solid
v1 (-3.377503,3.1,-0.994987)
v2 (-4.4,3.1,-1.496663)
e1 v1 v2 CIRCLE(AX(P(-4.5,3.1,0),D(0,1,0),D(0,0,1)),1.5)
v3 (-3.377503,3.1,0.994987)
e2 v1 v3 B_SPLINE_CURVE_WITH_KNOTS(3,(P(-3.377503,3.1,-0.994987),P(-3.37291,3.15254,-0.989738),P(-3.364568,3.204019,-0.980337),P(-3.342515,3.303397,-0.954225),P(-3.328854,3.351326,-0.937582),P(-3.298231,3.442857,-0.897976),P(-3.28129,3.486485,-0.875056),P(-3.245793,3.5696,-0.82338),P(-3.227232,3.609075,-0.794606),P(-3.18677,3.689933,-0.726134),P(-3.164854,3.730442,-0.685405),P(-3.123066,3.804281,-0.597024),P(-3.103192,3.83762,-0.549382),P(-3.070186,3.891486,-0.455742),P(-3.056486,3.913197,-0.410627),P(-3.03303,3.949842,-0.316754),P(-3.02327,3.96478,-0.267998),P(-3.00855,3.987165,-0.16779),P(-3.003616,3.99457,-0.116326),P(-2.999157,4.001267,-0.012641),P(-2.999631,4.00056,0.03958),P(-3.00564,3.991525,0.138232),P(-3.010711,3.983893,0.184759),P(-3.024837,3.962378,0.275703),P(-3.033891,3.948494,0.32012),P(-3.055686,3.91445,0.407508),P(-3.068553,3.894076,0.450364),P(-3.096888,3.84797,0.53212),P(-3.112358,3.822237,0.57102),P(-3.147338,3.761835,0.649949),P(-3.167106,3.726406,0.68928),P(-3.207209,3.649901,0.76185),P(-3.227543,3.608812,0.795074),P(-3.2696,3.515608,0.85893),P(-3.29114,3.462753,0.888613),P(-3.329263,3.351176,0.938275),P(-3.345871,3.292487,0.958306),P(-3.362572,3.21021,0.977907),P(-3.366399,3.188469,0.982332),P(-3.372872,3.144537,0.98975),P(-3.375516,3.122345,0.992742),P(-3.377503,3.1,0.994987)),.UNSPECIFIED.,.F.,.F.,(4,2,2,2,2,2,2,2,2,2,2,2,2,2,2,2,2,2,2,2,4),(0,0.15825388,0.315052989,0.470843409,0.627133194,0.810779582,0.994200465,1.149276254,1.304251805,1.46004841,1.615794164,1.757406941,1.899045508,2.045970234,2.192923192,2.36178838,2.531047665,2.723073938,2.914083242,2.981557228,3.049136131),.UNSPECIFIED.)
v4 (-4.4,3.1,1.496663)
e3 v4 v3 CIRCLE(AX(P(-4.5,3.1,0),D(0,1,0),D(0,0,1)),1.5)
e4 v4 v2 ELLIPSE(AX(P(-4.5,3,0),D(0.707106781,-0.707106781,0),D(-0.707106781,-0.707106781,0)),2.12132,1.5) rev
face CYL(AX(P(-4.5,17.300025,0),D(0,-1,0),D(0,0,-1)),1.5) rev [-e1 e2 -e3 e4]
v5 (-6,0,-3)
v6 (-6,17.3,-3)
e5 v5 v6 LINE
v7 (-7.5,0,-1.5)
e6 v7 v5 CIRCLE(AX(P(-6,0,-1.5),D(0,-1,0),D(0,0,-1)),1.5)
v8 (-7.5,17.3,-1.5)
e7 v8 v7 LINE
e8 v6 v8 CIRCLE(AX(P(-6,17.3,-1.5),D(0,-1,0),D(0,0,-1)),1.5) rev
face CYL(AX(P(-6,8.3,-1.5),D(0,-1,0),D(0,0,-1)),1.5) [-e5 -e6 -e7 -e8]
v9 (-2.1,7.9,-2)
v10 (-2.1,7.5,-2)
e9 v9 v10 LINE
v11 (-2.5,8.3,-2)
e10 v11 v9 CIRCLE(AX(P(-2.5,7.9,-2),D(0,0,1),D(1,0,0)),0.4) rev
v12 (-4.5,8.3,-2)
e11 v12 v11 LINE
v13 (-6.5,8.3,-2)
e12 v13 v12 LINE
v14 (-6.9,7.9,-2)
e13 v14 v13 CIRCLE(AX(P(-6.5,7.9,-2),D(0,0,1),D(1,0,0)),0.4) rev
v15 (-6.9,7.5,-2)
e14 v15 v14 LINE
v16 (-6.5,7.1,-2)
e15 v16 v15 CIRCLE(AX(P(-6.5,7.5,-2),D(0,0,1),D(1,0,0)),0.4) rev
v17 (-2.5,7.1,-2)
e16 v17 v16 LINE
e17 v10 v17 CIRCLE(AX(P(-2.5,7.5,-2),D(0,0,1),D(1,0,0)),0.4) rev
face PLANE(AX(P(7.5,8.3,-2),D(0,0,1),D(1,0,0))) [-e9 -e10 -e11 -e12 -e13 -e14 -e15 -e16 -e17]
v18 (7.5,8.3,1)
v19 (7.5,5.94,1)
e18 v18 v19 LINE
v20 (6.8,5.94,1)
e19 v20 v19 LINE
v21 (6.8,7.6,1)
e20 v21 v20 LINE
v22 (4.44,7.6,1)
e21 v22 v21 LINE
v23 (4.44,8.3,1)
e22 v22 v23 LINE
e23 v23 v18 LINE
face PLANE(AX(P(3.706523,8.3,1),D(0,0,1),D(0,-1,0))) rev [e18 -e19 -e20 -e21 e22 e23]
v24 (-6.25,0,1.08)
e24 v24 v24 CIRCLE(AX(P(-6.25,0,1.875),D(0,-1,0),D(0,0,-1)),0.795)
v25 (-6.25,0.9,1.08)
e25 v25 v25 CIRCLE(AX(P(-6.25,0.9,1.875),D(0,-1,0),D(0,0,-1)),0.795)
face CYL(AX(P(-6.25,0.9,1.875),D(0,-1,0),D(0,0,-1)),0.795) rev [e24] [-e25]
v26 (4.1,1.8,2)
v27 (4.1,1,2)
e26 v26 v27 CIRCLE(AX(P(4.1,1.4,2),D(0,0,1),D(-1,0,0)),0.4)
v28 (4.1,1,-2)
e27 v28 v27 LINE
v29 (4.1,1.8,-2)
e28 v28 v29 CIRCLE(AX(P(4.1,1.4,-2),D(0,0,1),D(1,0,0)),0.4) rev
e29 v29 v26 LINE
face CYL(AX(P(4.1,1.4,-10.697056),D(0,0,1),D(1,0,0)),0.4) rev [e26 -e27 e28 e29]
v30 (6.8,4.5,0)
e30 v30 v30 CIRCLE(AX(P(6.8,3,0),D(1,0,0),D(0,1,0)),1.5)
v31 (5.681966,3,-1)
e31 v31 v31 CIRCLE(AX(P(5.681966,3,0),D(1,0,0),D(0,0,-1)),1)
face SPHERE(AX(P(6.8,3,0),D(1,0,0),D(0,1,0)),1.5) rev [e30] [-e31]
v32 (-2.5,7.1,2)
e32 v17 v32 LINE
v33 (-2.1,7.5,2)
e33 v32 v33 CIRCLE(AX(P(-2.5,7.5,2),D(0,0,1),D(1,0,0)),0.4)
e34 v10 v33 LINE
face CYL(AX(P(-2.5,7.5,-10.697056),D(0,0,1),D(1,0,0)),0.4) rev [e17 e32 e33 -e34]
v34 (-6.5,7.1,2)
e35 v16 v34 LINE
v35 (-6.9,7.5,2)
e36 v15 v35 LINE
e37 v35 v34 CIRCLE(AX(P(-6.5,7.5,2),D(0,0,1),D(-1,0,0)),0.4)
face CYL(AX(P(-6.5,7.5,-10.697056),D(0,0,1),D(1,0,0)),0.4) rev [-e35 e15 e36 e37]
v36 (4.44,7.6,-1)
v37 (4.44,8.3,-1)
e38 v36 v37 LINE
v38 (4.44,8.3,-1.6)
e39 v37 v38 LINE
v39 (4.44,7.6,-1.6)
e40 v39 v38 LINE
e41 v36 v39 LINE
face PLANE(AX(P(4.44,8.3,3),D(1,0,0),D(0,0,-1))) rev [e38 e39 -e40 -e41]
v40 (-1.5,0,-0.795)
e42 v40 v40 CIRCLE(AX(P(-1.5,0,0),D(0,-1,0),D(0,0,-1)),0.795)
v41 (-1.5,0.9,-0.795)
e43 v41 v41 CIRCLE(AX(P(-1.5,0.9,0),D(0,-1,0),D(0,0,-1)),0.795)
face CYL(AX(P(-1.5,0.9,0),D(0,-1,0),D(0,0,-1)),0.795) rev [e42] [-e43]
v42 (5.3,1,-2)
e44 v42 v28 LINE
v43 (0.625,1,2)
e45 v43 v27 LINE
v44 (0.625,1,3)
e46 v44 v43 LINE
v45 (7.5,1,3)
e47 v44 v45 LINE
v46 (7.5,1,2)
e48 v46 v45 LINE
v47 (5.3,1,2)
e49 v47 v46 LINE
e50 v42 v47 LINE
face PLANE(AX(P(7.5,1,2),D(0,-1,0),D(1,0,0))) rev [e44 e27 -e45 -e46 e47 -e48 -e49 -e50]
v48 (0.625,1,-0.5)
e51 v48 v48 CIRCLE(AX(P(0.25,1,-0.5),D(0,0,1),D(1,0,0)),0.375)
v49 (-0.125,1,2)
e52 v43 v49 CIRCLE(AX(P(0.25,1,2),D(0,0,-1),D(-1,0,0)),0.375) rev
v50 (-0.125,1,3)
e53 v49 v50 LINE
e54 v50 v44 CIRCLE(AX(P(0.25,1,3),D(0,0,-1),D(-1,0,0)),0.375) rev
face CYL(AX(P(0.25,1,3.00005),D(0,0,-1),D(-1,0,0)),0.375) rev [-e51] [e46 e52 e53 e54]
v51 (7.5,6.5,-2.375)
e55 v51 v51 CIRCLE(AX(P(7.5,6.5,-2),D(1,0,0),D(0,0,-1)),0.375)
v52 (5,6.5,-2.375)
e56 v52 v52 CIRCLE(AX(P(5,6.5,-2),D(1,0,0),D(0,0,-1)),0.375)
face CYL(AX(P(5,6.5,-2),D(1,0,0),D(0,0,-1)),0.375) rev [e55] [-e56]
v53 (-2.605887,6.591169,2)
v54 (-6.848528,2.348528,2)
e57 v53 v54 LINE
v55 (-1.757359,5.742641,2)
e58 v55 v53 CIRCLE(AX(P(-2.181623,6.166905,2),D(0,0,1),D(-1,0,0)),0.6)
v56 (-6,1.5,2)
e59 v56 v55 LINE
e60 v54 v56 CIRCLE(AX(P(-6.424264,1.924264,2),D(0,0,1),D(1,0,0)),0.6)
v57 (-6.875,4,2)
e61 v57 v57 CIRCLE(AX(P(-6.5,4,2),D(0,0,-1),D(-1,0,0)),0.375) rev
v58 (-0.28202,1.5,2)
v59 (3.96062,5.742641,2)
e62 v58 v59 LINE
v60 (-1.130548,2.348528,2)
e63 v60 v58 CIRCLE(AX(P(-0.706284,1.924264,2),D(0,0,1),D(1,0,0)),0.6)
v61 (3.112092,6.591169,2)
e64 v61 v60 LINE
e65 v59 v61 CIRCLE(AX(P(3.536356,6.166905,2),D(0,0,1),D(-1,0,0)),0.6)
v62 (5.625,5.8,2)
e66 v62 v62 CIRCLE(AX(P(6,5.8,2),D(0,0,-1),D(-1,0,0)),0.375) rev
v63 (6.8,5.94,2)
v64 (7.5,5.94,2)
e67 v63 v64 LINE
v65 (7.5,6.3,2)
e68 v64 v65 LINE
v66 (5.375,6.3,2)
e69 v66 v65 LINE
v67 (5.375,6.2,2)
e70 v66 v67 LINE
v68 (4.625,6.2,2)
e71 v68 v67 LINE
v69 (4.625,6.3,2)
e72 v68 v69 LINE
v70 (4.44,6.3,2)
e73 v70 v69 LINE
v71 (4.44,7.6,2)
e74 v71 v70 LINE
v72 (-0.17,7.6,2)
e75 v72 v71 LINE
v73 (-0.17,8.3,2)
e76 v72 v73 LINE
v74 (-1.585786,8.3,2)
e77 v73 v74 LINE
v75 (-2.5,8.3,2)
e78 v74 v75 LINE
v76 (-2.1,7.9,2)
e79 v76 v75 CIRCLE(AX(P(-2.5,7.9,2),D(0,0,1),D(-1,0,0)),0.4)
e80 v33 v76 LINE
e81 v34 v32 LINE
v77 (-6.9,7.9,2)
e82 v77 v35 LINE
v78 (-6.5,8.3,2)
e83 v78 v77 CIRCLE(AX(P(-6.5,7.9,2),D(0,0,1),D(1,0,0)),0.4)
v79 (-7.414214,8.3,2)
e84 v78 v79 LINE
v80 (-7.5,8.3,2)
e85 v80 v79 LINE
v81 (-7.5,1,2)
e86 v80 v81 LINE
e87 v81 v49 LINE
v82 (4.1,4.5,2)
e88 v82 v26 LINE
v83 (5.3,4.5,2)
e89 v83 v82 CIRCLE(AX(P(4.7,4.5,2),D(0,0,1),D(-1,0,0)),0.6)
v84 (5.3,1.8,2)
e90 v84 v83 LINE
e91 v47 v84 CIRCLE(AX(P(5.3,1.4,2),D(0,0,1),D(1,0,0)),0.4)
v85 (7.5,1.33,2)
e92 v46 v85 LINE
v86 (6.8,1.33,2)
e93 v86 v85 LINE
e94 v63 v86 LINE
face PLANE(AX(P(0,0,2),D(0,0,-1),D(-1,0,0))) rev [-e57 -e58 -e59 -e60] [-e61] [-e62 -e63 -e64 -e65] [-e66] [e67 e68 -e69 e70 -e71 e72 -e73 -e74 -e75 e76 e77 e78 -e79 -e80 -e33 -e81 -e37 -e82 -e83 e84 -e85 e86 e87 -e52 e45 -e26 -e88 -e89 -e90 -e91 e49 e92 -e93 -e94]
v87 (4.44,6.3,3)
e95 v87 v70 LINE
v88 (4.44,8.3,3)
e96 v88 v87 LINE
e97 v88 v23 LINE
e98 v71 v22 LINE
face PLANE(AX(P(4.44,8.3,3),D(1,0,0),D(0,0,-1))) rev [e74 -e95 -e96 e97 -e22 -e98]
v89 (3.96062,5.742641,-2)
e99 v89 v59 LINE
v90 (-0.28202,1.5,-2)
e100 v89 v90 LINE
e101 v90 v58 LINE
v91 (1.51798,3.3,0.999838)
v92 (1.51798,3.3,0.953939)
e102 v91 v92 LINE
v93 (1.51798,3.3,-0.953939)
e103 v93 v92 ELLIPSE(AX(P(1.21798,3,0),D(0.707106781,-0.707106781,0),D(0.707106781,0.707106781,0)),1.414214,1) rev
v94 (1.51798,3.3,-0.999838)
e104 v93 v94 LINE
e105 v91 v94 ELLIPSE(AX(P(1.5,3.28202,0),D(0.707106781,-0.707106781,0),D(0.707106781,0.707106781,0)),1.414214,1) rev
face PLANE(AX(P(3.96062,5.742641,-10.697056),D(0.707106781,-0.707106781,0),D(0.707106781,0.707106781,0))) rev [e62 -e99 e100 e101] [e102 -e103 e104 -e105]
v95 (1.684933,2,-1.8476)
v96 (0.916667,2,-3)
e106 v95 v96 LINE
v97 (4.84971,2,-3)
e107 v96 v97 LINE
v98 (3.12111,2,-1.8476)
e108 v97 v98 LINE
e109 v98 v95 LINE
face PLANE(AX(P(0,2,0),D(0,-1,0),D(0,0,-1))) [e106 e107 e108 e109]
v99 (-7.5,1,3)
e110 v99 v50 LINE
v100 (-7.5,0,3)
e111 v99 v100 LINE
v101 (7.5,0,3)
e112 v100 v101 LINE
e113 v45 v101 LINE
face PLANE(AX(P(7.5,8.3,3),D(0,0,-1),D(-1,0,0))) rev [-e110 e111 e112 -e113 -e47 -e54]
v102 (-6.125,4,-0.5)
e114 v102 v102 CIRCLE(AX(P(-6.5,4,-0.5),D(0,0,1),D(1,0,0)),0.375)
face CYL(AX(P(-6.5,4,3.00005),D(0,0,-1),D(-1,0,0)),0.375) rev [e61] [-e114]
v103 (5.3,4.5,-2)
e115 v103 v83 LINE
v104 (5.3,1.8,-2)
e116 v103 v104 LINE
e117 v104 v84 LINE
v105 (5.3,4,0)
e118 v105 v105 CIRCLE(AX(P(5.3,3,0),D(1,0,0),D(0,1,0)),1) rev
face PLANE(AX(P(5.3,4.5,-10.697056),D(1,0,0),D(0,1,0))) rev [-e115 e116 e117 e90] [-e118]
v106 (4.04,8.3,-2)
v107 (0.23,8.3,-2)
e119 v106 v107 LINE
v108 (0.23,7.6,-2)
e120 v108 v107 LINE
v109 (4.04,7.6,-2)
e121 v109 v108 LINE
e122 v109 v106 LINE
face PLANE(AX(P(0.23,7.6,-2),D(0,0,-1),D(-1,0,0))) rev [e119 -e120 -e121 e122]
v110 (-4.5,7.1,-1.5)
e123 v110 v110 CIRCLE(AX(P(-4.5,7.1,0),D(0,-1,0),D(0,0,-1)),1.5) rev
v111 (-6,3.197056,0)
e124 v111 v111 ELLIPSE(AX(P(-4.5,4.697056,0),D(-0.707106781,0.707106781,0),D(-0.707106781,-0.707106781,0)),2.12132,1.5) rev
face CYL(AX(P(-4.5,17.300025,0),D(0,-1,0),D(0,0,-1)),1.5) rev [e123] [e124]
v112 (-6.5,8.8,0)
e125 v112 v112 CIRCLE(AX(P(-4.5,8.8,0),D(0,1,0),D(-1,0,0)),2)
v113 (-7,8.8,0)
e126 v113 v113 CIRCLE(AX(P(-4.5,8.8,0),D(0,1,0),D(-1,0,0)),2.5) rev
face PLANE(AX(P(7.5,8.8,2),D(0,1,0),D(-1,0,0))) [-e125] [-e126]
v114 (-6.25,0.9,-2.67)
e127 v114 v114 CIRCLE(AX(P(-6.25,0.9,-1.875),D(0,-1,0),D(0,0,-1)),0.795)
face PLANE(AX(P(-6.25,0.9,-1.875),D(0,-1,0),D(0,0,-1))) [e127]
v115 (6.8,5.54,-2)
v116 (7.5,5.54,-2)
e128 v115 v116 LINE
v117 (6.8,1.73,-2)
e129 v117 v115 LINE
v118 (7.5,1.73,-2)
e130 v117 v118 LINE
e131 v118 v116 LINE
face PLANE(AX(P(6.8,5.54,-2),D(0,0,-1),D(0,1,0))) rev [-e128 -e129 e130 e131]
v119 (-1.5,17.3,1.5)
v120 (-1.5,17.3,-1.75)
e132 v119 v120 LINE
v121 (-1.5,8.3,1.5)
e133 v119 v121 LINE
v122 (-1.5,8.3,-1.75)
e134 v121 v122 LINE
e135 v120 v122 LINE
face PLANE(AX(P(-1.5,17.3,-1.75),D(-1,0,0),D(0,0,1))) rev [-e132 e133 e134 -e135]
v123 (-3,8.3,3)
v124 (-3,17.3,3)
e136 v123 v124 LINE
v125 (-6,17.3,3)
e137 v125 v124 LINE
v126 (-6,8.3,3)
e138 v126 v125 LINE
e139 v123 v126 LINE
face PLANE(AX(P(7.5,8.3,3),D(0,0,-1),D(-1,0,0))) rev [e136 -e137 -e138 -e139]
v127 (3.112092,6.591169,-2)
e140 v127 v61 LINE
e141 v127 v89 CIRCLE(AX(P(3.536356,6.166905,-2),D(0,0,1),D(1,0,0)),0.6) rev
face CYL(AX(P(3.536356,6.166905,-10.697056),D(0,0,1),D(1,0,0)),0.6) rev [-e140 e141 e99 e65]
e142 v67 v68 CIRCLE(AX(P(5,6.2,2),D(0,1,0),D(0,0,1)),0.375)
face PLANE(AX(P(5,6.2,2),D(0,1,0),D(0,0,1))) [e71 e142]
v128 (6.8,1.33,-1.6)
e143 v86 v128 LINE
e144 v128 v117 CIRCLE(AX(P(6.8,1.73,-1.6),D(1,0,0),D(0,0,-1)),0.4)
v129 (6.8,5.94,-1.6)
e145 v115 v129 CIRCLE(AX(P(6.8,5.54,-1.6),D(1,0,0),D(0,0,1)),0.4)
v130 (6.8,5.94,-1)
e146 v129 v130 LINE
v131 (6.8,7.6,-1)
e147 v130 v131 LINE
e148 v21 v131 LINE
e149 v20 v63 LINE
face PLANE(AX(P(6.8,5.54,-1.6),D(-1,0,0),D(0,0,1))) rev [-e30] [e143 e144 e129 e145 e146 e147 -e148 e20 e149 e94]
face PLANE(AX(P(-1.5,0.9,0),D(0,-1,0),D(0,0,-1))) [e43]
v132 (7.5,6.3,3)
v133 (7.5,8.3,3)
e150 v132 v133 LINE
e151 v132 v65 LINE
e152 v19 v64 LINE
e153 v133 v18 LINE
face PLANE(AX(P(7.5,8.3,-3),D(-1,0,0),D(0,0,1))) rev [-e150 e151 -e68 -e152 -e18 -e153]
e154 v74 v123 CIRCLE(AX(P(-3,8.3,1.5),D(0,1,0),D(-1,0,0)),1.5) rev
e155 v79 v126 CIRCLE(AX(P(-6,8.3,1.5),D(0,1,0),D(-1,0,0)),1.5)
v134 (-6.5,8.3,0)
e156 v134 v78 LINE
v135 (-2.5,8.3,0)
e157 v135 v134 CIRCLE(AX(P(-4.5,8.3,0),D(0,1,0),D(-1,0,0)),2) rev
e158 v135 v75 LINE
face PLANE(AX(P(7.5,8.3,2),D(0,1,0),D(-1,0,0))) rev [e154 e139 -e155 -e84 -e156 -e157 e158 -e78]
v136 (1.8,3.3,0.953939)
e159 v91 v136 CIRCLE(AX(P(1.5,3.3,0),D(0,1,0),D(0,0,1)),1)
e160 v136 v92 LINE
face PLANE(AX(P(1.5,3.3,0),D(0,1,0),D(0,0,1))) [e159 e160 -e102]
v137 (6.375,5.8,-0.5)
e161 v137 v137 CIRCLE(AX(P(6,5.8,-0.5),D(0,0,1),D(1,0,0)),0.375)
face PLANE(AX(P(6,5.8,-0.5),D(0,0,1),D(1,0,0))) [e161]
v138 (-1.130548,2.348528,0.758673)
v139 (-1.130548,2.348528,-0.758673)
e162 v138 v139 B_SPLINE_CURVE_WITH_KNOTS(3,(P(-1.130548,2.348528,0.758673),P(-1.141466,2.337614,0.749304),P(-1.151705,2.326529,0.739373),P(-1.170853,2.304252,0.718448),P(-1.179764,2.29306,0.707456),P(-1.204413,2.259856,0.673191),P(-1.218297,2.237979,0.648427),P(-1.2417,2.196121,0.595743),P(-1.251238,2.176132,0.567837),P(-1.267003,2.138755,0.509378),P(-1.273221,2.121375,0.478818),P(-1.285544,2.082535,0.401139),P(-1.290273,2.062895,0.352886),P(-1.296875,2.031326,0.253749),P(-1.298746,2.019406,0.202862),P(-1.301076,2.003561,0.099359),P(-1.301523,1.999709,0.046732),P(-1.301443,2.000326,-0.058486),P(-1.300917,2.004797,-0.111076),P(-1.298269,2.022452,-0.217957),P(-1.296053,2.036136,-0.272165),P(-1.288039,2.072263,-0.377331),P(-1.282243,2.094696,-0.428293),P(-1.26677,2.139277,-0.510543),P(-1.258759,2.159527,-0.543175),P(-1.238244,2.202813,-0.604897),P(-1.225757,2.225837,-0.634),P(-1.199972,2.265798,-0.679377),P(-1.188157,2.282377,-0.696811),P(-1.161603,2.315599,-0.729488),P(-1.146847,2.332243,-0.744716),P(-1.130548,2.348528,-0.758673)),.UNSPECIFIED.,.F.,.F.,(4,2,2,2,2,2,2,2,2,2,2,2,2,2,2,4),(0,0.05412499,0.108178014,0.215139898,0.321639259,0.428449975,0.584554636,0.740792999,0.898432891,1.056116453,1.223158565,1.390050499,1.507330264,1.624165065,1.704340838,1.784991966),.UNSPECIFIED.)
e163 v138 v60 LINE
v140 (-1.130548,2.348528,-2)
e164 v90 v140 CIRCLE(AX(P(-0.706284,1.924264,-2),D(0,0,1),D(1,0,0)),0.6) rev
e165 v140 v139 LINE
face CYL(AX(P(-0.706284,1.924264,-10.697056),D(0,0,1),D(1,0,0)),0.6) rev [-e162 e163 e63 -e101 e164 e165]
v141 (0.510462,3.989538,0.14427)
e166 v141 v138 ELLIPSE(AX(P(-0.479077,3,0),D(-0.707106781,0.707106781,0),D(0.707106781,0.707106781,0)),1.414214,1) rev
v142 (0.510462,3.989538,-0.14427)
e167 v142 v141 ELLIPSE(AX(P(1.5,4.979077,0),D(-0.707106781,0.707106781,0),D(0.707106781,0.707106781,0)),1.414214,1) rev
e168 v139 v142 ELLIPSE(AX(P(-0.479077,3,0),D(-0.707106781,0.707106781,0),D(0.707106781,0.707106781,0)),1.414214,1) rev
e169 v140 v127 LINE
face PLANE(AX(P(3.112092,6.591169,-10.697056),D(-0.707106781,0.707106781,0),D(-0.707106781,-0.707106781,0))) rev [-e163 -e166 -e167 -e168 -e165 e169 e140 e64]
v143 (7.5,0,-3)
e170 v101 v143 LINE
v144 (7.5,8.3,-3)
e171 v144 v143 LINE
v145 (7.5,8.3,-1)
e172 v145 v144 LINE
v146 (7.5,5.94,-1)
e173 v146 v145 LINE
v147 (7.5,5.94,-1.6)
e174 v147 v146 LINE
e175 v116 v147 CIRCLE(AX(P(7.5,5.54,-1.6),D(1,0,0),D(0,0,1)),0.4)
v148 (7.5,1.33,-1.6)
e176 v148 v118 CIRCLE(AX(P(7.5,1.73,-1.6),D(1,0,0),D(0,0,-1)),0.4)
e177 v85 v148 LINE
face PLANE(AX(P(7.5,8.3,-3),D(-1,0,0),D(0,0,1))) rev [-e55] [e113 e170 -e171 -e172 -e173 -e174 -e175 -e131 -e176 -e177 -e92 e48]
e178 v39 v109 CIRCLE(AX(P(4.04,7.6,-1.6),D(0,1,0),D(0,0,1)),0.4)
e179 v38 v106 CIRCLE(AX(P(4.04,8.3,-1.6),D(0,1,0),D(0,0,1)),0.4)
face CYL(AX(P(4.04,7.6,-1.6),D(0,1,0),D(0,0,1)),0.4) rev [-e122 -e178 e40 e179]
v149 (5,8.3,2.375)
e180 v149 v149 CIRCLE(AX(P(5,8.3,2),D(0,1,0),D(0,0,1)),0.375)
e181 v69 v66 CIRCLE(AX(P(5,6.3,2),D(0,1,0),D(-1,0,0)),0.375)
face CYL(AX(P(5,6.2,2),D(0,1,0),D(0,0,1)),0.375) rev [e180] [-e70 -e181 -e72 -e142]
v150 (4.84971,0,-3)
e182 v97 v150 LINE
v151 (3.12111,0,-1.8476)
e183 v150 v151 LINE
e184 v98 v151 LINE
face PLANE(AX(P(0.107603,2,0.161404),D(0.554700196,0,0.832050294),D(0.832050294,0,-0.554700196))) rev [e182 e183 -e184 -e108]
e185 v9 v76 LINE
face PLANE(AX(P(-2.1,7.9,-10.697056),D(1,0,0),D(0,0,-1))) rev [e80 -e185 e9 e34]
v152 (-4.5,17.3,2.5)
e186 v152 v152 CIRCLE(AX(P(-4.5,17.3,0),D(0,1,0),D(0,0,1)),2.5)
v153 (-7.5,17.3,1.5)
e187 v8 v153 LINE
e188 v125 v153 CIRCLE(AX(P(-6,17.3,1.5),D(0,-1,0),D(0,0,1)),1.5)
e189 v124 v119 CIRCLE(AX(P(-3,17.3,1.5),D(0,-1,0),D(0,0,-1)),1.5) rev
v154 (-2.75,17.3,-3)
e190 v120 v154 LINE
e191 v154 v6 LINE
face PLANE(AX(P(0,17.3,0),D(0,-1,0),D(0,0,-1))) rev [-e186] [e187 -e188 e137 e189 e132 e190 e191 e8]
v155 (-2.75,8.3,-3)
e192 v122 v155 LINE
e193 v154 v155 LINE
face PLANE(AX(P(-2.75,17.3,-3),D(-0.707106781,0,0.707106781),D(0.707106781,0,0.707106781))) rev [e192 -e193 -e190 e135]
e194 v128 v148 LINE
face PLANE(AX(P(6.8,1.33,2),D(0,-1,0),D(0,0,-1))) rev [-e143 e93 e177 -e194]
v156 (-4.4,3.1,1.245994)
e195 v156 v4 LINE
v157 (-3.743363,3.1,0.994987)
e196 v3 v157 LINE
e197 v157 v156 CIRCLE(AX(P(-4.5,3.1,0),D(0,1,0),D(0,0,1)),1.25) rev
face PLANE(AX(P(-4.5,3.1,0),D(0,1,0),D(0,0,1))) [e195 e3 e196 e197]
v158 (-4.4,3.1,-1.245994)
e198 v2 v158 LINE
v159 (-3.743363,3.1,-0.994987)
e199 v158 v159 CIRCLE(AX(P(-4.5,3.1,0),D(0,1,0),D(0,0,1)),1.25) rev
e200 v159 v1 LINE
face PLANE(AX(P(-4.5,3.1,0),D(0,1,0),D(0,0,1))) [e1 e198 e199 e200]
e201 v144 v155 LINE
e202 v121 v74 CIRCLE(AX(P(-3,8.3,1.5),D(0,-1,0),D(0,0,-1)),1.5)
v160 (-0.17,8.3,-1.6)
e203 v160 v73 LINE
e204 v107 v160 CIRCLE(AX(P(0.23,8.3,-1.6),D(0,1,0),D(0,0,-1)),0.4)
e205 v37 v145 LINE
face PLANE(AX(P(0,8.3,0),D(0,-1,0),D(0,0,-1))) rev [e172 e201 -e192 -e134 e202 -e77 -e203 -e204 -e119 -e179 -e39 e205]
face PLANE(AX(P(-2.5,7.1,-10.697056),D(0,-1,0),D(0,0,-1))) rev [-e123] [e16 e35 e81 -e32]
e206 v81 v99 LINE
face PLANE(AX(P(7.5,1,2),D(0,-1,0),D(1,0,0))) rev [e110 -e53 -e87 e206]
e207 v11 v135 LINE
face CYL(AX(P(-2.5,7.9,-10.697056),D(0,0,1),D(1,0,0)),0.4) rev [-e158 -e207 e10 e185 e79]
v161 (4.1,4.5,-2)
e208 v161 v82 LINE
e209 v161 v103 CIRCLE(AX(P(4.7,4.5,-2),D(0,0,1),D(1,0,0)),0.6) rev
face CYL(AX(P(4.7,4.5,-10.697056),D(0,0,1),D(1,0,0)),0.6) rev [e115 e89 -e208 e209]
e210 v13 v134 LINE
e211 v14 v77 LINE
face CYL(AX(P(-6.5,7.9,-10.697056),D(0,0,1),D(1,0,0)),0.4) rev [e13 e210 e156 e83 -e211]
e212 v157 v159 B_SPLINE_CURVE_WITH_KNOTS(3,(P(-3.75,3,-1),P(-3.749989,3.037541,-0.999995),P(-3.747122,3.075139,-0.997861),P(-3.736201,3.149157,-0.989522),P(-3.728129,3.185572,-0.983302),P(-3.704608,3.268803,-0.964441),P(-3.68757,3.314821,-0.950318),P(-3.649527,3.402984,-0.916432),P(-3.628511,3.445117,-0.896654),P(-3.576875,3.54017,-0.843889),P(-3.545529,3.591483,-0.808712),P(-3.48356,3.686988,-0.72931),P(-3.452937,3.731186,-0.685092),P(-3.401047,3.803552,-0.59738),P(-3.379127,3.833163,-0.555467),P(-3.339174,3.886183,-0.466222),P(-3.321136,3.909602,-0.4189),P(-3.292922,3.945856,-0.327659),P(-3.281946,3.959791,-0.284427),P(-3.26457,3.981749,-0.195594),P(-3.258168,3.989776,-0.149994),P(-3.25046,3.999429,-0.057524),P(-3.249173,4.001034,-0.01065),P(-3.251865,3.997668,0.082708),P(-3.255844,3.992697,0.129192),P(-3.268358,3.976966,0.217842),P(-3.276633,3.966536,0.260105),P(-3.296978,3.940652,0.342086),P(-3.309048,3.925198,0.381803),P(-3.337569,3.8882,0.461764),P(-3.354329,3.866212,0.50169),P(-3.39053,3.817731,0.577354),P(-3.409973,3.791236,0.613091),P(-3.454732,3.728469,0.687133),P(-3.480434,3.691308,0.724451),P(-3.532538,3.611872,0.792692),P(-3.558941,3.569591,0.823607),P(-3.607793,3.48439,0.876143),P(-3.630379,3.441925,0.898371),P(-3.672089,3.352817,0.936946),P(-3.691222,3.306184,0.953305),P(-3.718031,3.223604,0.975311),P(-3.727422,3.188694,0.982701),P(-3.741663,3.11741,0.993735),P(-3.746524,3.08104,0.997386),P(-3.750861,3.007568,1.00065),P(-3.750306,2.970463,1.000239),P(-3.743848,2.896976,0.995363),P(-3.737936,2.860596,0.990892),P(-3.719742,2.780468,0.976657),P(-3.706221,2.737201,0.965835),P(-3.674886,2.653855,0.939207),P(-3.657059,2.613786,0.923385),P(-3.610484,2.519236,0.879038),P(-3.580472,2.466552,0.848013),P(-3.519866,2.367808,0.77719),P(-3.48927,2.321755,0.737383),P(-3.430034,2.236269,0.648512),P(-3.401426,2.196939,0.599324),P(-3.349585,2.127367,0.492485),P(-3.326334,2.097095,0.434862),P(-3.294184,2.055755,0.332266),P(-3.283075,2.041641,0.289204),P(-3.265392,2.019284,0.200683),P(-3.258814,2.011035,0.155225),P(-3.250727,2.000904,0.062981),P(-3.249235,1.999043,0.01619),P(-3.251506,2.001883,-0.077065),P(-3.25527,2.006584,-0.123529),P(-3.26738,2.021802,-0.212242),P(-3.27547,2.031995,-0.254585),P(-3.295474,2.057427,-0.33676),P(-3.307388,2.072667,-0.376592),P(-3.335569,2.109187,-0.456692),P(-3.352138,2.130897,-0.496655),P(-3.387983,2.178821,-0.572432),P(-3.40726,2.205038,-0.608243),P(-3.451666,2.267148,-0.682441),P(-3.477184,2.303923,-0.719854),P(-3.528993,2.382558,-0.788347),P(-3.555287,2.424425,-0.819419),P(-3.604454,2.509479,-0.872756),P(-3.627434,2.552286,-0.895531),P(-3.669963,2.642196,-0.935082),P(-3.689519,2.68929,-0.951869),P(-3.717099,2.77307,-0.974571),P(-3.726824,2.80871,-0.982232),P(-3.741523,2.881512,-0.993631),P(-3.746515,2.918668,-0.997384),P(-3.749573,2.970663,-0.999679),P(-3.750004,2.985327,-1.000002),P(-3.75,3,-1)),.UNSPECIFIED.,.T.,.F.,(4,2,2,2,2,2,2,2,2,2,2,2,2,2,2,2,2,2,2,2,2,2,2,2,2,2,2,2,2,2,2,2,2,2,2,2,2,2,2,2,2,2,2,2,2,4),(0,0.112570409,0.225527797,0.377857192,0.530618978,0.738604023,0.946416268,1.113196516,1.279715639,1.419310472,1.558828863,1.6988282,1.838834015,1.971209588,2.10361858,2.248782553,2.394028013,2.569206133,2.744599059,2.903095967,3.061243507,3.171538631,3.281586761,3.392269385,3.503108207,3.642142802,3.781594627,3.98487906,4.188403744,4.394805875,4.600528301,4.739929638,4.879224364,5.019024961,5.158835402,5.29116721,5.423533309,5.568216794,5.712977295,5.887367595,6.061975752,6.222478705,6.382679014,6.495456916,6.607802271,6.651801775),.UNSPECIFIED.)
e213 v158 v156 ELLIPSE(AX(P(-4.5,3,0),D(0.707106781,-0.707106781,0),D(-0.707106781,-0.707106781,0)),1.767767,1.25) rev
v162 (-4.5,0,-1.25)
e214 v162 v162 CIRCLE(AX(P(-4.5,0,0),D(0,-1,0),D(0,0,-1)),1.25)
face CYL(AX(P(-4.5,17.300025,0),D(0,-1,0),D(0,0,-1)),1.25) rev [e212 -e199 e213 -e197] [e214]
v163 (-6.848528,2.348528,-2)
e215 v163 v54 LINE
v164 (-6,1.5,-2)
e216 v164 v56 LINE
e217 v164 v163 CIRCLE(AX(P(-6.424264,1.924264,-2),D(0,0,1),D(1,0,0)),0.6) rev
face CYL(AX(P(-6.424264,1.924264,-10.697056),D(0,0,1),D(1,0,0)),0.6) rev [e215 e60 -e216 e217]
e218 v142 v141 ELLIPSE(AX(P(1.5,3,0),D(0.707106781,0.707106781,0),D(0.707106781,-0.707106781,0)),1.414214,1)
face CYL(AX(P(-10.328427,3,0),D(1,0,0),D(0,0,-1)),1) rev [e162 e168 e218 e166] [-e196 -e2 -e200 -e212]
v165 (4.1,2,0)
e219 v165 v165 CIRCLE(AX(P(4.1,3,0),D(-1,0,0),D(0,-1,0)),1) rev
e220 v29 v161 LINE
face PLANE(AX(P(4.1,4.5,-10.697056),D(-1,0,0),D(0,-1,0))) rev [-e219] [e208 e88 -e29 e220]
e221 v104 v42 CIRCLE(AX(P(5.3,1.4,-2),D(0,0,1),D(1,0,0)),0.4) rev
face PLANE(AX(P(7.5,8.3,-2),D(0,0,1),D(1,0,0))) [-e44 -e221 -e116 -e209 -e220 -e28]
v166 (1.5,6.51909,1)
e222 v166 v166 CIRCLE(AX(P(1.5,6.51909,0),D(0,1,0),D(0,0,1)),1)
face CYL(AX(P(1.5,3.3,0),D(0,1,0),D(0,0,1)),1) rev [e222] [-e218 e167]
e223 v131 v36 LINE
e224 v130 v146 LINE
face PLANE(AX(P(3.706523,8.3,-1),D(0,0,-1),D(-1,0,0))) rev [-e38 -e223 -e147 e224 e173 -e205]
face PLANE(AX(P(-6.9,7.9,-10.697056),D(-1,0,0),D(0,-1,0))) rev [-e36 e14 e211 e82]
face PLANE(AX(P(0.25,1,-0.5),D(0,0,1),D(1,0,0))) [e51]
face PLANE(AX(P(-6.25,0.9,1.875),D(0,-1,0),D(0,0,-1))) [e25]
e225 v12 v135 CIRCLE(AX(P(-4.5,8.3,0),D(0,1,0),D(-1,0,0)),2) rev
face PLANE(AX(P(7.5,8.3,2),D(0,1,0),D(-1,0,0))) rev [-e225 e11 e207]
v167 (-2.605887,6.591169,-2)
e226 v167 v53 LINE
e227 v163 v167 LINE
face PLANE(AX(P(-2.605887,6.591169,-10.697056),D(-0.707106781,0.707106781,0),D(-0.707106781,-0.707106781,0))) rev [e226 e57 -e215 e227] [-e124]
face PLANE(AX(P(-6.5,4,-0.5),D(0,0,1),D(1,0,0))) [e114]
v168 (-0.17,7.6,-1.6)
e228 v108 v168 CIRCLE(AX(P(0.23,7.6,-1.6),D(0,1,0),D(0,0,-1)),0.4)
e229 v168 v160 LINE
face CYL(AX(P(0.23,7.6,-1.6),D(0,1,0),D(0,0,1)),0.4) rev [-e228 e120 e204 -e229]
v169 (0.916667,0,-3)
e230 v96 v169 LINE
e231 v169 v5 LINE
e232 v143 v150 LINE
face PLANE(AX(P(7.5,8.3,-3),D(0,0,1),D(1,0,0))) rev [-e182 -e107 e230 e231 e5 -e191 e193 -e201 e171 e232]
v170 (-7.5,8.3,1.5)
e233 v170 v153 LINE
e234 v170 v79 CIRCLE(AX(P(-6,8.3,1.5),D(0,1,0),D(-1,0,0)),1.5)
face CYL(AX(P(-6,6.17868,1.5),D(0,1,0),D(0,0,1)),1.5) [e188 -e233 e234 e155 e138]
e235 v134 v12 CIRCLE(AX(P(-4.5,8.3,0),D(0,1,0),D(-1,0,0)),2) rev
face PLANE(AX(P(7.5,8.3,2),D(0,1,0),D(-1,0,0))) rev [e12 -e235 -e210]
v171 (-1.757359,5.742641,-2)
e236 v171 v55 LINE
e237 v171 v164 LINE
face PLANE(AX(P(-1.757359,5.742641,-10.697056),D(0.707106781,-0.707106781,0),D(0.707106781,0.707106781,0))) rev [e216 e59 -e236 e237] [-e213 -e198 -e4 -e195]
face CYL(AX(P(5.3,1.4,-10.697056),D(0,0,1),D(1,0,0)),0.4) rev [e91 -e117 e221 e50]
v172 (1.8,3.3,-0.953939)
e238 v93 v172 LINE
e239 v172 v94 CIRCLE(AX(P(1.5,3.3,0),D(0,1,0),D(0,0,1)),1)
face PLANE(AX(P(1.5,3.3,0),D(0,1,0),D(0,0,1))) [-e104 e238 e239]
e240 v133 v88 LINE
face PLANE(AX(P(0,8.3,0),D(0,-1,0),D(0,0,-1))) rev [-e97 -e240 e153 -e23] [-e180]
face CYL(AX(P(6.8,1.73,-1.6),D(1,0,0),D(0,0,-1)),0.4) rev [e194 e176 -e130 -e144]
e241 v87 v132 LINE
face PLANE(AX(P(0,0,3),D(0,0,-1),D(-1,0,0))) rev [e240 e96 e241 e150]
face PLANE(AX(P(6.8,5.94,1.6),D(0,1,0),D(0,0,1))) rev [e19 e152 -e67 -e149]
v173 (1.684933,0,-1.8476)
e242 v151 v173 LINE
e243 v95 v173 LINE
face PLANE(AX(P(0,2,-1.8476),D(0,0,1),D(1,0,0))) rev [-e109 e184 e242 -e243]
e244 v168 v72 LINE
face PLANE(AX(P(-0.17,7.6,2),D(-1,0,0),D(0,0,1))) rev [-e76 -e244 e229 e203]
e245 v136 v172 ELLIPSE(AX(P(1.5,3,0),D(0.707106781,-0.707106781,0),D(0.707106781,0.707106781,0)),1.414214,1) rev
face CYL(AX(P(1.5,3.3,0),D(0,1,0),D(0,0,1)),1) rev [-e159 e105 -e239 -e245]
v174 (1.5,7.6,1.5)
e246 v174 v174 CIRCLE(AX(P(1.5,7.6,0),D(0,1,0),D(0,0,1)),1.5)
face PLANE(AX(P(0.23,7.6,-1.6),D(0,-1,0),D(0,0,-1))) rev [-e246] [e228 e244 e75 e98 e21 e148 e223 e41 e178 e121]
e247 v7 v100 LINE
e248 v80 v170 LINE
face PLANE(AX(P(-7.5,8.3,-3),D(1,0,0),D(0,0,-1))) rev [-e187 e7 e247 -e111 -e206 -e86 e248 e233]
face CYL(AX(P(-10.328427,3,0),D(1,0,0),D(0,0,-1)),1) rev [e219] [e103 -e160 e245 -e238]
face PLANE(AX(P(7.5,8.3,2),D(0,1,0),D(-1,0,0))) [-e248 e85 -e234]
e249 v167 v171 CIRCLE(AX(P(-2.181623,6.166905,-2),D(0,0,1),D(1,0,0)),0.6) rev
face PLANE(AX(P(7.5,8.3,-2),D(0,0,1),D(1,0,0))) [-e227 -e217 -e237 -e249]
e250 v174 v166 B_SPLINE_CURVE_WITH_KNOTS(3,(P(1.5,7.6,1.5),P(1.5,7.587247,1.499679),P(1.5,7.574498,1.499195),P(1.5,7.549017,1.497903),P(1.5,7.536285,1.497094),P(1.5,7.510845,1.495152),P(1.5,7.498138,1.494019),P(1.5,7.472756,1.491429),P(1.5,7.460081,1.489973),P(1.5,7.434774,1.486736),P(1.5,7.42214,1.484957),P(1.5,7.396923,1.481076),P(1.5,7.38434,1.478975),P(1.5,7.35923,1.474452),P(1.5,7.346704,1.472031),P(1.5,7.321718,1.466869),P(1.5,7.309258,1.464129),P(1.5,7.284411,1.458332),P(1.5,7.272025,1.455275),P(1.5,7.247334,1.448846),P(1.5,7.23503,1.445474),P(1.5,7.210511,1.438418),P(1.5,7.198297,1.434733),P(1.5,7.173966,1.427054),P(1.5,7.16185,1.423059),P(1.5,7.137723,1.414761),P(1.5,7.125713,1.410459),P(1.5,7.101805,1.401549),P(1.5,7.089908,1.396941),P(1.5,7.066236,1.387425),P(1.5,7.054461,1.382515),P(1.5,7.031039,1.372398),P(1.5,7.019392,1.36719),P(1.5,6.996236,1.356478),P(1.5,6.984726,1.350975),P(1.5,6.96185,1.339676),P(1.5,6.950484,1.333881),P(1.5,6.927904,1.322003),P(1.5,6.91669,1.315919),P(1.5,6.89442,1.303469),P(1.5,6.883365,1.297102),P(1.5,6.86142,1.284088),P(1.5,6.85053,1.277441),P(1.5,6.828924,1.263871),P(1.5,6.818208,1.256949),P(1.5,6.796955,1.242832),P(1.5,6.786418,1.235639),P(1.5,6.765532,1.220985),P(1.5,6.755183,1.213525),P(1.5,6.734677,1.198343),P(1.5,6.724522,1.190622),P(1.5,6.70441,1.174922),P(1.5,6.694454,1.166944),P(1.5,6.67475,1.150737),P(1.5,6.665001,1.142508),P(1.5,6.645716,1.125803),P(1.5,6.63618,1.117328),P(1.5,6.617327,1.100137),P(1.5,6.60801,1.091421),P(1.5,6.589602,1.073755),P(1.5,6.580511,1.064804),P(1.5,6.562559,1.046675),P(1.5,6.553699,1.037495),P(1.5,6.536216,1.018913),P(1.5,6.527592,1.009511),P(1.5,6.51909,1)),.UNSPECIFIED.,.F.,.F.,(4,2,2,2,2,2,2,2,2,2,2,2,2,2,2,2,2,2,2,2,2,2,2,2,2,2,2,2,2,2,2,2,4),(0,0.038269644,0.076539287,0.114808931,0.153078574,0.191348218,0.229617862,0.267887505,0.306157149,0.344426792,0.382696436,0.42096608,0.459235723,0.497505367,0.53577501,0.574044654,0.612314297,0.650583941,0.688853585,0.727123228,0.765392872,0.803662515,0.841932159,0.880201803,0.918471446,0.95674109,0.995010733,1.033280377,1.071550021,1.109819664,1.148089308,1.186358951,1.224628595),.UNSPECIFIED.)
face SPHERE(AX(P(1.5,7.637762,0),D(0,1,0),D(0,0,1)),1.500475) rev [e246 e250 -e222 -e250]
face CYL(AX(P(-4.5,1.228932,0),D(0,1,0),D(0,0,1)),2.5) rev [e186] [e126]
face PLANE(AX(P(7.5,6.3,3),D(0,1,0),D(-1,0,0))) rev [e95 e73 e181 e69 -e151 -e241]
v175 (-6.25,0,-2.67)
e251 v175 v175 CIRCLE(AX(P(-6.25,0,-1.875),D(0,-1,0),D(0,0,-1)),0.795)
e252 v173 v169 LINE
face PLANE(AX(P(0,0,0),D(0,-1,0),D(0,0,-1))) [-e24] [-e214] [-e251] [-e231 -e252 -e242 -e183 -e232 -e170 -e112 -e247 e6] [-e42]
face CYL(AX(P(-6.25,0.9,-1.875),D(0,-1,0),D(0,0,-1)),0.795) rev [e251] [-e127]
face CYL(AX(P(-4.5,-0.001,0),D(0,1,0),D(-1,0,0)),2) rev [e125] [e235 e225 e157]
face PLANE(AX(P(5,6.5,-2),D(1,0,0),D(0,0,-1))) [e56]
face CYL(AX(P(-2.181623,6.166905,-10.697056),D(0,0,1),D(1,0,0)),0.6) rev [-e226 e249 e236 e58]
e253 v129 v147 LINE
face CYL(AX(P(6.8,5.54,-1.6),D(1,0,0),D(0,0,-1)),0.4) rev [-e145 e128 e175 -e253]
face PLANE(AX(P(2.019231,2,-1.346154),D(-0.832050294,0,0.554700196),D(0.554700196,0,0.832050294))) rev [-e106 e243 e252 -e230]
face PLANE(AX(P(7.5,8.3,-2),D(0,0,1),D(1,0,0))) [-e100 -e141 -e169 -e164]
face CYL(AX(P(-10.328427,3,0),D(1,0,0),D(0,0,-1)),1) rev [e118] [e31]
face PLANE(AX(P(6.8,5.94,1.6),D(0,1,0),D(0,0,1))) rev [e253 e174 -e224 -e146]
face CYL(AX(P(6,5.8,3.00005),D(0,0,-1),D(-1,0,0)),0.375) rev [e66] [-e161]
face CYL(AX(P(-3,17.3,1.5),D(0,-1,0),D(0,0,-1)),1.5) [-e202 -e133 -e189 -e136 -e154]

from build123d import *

# Parameters (mm, degrees)
SKETCH1_W                        = 15
SKETCH1_H                        = 6
MAIN_BODY_EXT_DEPTH              = 8.3
EMISSION_PATH_EXT_DEPTH          = 9
SKETCH3_R                        = 1.25
EMISSION_AND_GRIN_CUT_DEPTH      = 20.092931
SKETCH4_R                        = 1
DRUM_LENS_CUT_DEPTH              = 13
SKETCH41_R                       = 1
ADDTL_LIGHT_SOURCE_DEPTH         = 5
SKETCH5_W                        = 15
SKETCH5_H                        = 7.3
FILTERCOVER_CUT1_DEPTH           = 1
TOP_LED_SCREW_W                  = 3.06
TOP_LED_SCREW_H                  = 2
BOSS_EXTRUDE1_DEPTH              = 1
FILTERSET_CUT2_DEPTH             = 4
SKETCH10_R                       = 2.5
EMISSION_LENS_CUT_DEPTH          = 8.5
SKETCH15_R                       = 0.795
MAGNETS_CUT_DEPTH                = 0.9
SCREW_HOLES_CUT_DEPTH            = 20.507434
SCREW_HOLES_CUT_DEPTH_BACK       = 2.5
SKETCH18_R                       = 0.375
EXTERNAL_FILLET_1_R              = 1.5
VERTICAL_PATH_CUT_DEPTH          = 14.011149
VERTICAL_PATH_CUT_DEPTH_BACK     = 4
SKETCH28_R                       = 1.5
CUT_EXTRUDE_ORIGINAL_LIGHT_DEPTH = 0.7
CUT_EXTRUDE_ADDTL_LIGHT_DEPTH    = 0.7
SKETCH29_R                       = 0.375
SIDE_LED_SCREW_DEPTH             = 2.5
SKETCH32_W                       = 2
SKETCH32_H                       = 2.36
SIDE_WIRE_SLOT_CUT_DEPTH         = 0.7
SKETCH45_W                       = 2.36
SKETCH45_H                       = 2
TOP_LED_SLOT_DEPTH               = 0.7
CUT_EXTRUDE16_DEPTH              = 9
CUT_EXTRUDE17_REACH              = 13.945
SKETCH37_R                       = 2
SKETCH51_R                       = 0.375
TOP_LE_SCREW_DEPTH               = 2.1
NOTCH_EXTRUDE_DEPTH              = 2


with BuildPart() as part:
    # Sketch1 → Main Body Ext (new body)
    with BuildSketch(Plane(origin=(0, 0, 0), x_dir=(1, 0, 0), z_dir=(0, 1, 0))):
        Rectangle(SKETCH1_W, SKETCH1_H)
    extrude(amount=MAIN_BODY_EXT_DEPTH)

    # Sketch8 → Emission Path Ext (add)
    with BuildSketch(Plane(origin=(0, 8.3, 0), x_dir=(1, 0, 0), z_dir=(0, 1, 0))):
        Polygon((-2.75, 3), (-1.5, 1.75), (-1.5, -3), (-7.5, -3), (-7.5, 3), align=None)
    extrude(amount=EMISSION_PATH_EXT_DEPTH)

    # Sketch3 → Emission and Grin Cut (cut, through all)
    with BuildSketch(Plane.XZ):
        with Locations(Location((-4.5, 0, 0), (0, 0, 270))):
            Circle(SKETCH3_R)
    extrude(amount=-EMISSION_AND_GRIN_CUT_DEPTH, mode=Mode.SUBTRACT)

    # Sketch4 → Drum Lens Cut (cut)
    with BuildSketch(Plane(origin=(7.5, 0, 0), x_dir=(0, 0, -1), z_dir=(1, 0, 0))):
        with Locations((0, 3)):
            Circle(SKETCH4_R)
    extrude(amount=-DRUM_LENS_CUT_DEPTH, mode=Mode.SUBTRACT)

    # Sketch41 → Addtl Light Source (cut)
    with BuildSketch(Plane(origin=(0, 8.3, 0), x_dir=(1, 0, 0), z_dir=(0, 1, 0))):
        with Locations(Location((1.5, 0, 0), (0, 0, 270))):
            Circle(SKETCH41_R)
    extrude(amount=-ADDTL_LIGHT_SOURCE_DEPTH, mode=Mode.SUBTRACT)

    # Sketch5 → FilterCover Cut1 (cut)
    with BuildSketch(Plane.XY.offset(3)):
        with Locations((0, 4.65)):
            Rectangle(SKETCH5_W, SKETCH5_H)
    extrude(amount=-FILTERCOVER_CUT1_DEPTH, mode=Mode.SUBTRACT)

    # Top-LED-Screw → Boss-Extrude1 (add)
    with BuildSketch(Plane.XY.offset(2)):
        with Locations((5.97, 7.3)):
            Rectangle(TOP_LED_SCREW_W, TOP_LED_SCREW_H)
    extrude(amount=BOSS_EXTRUDE1_DEPTH)

    # Sketch6 → FilterSet Cut2 (cut)
    with BuildSketch(Plane.XY.offset(2)):
        with BuildLine():
            Line((5.3, 4.5), (5.3, 1.8))
            ThreePointArc((5.3, 1.8), (5.7, 1.4), (5.3, 1))
            Line((5.3, 1), (4.1, 1))
            ThreePointArc((4.1, 1), (3.7, 1.4), (4.1, 1.8))
            Line((4.1, 1.8), (4.1, 4.5))
            ThreePointArc((4.1, 4.5), (4.7, 5.1), (5.3, 4.5))
        make_face()
        with BuildLine():
            Line((-6.9, 7.9), (-6.9, 7.5))
            ThreePointArc((-6.9, 7.5), (-6.782843, 7.217157), (-6.5, 7.1))
            Line((-6.5, 7.1), (-2.5, 7.1))
            ThreePointArc((-2.5, 7.1), (-2.217157, 7.217157), (-2.1, 7.5))
            Line((-2.1, 7.5), (-2.1, 7.9))
            ThreePointArc((-2.1, 7.9), (-2.217157, 8.182843), (-2.5, 8.3))
            Line((-2.5, 8.3), (-6.5, 8.3))
            ThreePointArc((-6.5, 8.3), (-6.782843, 8.182843), (-6.9, 7.9))
        make_face()
        with BuildLine():
            Line((-2.605887, 6.591169), (-6.848528, 2.348528))
            ThreePointArc((-6.848528, 2.348528), (-6.848528, 1.5), (-6, 1.5))
            Line((-6, 1.5), (-1.757359, 5.742641))
            ThreePointArc((-1.757359, 5.742641), (-1.757359, 6.591169), (-2.605887, 6.591169))
        make_face()
        with BuildLine():
            Line((3.112092, 6.591169), (-1.130548, 2.348528))
            ThreePointArc((-1.130548, 2.348528), (-1.130548, 1.5), (-0.28202, 1.5))
            Line((-0.28202, 1.5), (3.96062, 5.742641))
            ThreePointArc((3.96062, 5.742641), (3.96062, 6.591169), (3.112092, 6.591169))
        make_face()
    extrude(amount=-FILTERSET_CUT2_DEPTH, mode=Mode.SUBTRACT)

    # Sketch10 → Emission Lens Cut (cut)
    with BuildSketch(Plane(origin=(0, 17.3, 0), x_dir=(1, 0, 0), z_dir=(0, 1, 0))):
        with Locations(Location((-4.5, 0, 0), (0, 0, 270))):
            Circle(SKETCH10_R)
    extrude(amount=-EMISSION_LENS_CUT_DEPTH, mode=Mode.SUBTRACT)

    # Sketch15 → Magnets Cut (cut)
    with BuildSketch(Plane.XZ):
        with Locations(Location((-6.25, -1.875, 0), (0, 0, 270))):
            Circle(SKETCH15_R)
        with Locations(Location((-6.25, 1.875, 0), (0, 0, 270))):
            Circle(SKETCH15_R)
        with Locations(Location((-1.5, 0, 0), (0, 0, 270))):
            Circle(SKETCH15_R)
    extrude(amount=-MAGNETS_CUT_DEPTH, mode=Mode.SUBTRACT)

    # Sketch18 → Screw Holes Cut (cut, two sides: drawn at the far end of the back side and taken through both)
    with BuildSketch(Plane.XY.offset(2).offset(-SCREW_HOLES_CUT_DEPTH_BACK)):
        with Locations(Location((-6.5, 4, 0), (0, 0, 180))):
            Circle(SKETCH18_R)
        with Locations(Location((6, 5.8, 0), (0, 0, 180))):
            Circle(SKETCH18_R)
        with Locations((0.25, 1)):
            Circle(SKETCH18_R)
    extrude(amount=SCREW_HOLES_CUT_DEPTH + SCREW_HOLES_CUT_DEPTH_BACK, mode=Mode.SUBTRACT)

    # External Fillet 1
    # the kernel refuses this fillet: 1.5 mm, written as the material it takes off along each edge
    with BuildSketch(Plane(origin=(-7.5, -3.75, -3), x_dir=(1, 0, 0), z_dir=(0, 1, 0))) as external_fillet_1_piece_1:
        with BuildLine():
            CenterArc((EXTERNAL_FILLET_1_R, -EXTERNAL_FILLET_1_R), EXTERNAL_FILLET_1_R, 90, 90)
            Line((0, -EXTERNAL_FILLET_1_R), (0, 0))
            Line((0, 0), (EXTERNAL_FILLET_1_R, 0))
        make_face()
    extrude(amount=24.8, mode=Mode.SUBTRACT)
    with BuildSketch(Plane(origin=(-1.5, 8.3, 3), x_dir=(0, 0, -1), z_dir=(0, 1, 0))) as external_fillet_1_piece_2:
        with BuildLine():
            CenterArc((EXTERNAL_FILLET_1_R, EXTERNAL_FILLET_1_R), EXTERNAL_FILLET_1_R, 180, 90)
            Line((0, EXTERNAL_FILLET_1_R), (0, 0))
            Line((0, 0), (EXTERNAL_FILLET_1_R, 0))
        make_face()
    extrude(amount=12.75, mode=Mode.SUBTRACT)

    # Sketch28 → Vertical-Path-Cut (cut, two sides: drawn at the far end of the back side and taken through both)
    with BuildSketch(Plane(origin=(0, 7.1, 0), x_dir=(1, 0, 0), z_dir=(0, 1, 0)).offset(-VERTICAL_PATH_CUT_DEPTH_BACK)):
        with Locations(Location((-4.5, 0, 0), (0, 0, 180))):
            Circle(SKETCH28_R)
    extrude(amount=VERTICAL_PATH_CUT_DEPTH + VERTICAL_PATH_CUT_DEPTH_BACK, mode=Mode.SUBTRACT)

    # Sketch12 → Cut-Extrude Original Light (cut)
    with BuildSketch(Plane(origin=(7.5, 0, 0), x_dir=(0, 0, -1), z_dir=(1, 0, 0))):
        with BuildLine():
            Line((1.6, 5.94), (-1.6, 5.94))
            Line((-1.6, 5.94), (-2, 5.94))
            Line((-2, 5.94), (-2, 1.33))
            Line((-2, 1.33), (1.6, 1.33))
            ThreePointArc((1.6, 1.33), (1.882843, 1.447157), (2, 1.73))
            Line((2, 1.73), (2, 5.54))
            ThreePointArc((2, 5.54), (1.882843, 5.822843), (1.6, 5.94))
        make_face()
    extrude(amount=-CUT_EXTRUDE_ORIGINAL_LIGHT_DEPTH, mode=Mode.SUBTRACT)

    # Sketch44 → Cut-Extrude Addtl Light (cut)
    with BuildSketch(Plane(origin=(0, 8.3, 0), x_dir=(1, 0, 0), z_dir=(0, 1, 0))):
        with BuildLine():
            Line((-0.17, -2), (4.44, -2))
            Line((4.44, -2), (4.44, 1.6))
            ThreePointArc((4.44, 1.6), (4.322843, 1.882843), (4.04, 2))
            Line((4.04, 2), (0.23, 2))
            ThreePointArc((0.23, 2), (-0.052843, 1.882843), (-0.17, 1.6))
            Line((-0.17, 1.6), (-0.17, -2))
        make_face()
    extrude(amount=-CUT_EXTRUDE_ADDTL_LIGHT_DEPTH, mode=Mode.SUBTRACT)

    # Sketch29 → Side-LED-Screw (cut)
    with BuildSketch(Plane(origin=(7.5, 0, 0), x_dir=(0, 0, -1), z_dir=(1, 0, 0))):
        with Locations((2, 6.5)):
            Circle(SKETCH29_R)
    extrude(amount=-SIDE_LED_SCREW_DEPTH, mode=Mode.SUBTRACT)

    # Sketch32 → Side-Wire-Slot-Cut (cut)
    with BuildSketch(Plane(origin=(7.5, 0, 0), x_dir=(0, 0, -1), z_dir=(1, 0, 0))):
        with Locations((0, 7.12)):
            Rectangle(SKETCH32_W, SKETCH32_H)
    extrude(amount=-SIDE_WIRE_SLOT_CUT_DEPTH, mode=Mode.SUBTRACT)

    # Sketch45 → Top-LED-slot (cut)
    with BuildSketch(Plane(origin=(0, 8.3, 0), x_dir=(1, 0, 0), z_dir=(0, 1, 0))):
        with Locations((5.62, 0)):
            Rectangle(SKETCH45_W, SKETCH45_H)
    extrude(amount=-TOP_LED_SLOT_DEPTH, mode=Mode.SUBTRACT)

    # Sketch33 → Side-BallLens_Cut (revolve, cut)
    with BuildSketch(Plane.XY, mode=Mode.PRIVATE) as side_balllens_cut_sk:
        with BuildLine():
            Line((6.8, 3), (5.3, 3))
            ThreePointArc((5.3, 3), (5.73934, 4.06066), (6.8, 4.5))
            Line((6.8, 4.5), (6.8, 3))
        make_face()
    revolve(side_balllens_cut_sk.sketch.rotate(Axis((6.8, 3, 0), (-1, 0, 0)), 84.26086), axis=Axis((6.8, 3, 0), (-1, 0, 0)), mode=Mode.SUBTRACT)

    # Sketch47 → Top-BallLens_Cut (revolve, cut)
    with BuildSketch(Plane(origin=(1.5, 0, 0), x_dir=(0, 0, -1), z_dir=(1, 0, 0))):
        with BuildLine():
            Line((-1.5, 7.6), (0, 7.6))
            Line((0, 7.6), (0, 6.137287))
            ThreePointArc((0, 6.137287), (-1.04756, 6.563498), (-1.5, 7.6))
        make_face()
    revolve(axis=Axis((1.5, 7.6, 0), (0, -1, 0)), mode=Mode.SUBTRACT)

    # Sketch36 → Cut-Extrude16 (cut)
    with BuildSketch(Plane(origin=(0, 17.3, 0), x_dir=(1, 0, 0), z_dir=(0, 1, 0))):
        with BuildLine():
            Line((-7.5, -1.5), (-7.5, -3))
            Line((-7.5, -3), (-6, -3))
            ThreePointArc((-6, -3), (-7.06066, -2.56066), (-7.5, -1.5))
        make_face()
    extrude(amount=-CUT_EXTRUDE16_DEPTH, mode=Mode.SUBTRACT)

    # Sketch37 → Cut-Extrude17 (cut, up to next)
    with BuildSketch(Plane(origin=(0, 8.8, 0), x_dir=(1, 0, 0), z_dir=(0, 1, 0)), mode=Mode.PRIVATE) as cut_extrude17_sk1:
        with Locations(Location((-4.5, 0, 0), (0, 0, 180))):
            Circle(SKETCH37_R)
    cut_extrude17_tool1 = extrude(cut_extrude17_sk1.sketch, amount=-CUT_EXTRUDE17_REACH, mode=Mode.PRIVATE) & part.part
    add(cut_extrude17_tool1.solids().sort_by_distance((-4.5, 8.8, 0))[0], mode=Mode.SUBTRACT)

    # Sketch51 → Top-LE-Screw (cut)
    with BuildSketch(Plane(origin=(0, 8.3, 0), x_dir=(1, 0, 0), z_dir=(0, 1, 0))):
        with Locations(Location((5, -2, 0), (0, 0, 270))):
            Circle(SKETCH51_R)
    extrude(amount=-TOP_LE_SCREW_DEPTH, mode=Mode.SUBTRACT)

    # Notch → Notch-Extrude (cut)
    with BuildSketch(Plane.XZ):
        Polygon((3.12111, -1.8476), (1.684933, -1.8476), (1.684933, -3), (4.84971, -3), align=None)
        Polygon((1.684933, -3), (1.684933, -1.8476), (0.916667, -3), align=None)
    extrude(amount=-NOTCH_EXTRUDE_DEPTH, mode=Mode.SUBTRACT)


solid = part.part
